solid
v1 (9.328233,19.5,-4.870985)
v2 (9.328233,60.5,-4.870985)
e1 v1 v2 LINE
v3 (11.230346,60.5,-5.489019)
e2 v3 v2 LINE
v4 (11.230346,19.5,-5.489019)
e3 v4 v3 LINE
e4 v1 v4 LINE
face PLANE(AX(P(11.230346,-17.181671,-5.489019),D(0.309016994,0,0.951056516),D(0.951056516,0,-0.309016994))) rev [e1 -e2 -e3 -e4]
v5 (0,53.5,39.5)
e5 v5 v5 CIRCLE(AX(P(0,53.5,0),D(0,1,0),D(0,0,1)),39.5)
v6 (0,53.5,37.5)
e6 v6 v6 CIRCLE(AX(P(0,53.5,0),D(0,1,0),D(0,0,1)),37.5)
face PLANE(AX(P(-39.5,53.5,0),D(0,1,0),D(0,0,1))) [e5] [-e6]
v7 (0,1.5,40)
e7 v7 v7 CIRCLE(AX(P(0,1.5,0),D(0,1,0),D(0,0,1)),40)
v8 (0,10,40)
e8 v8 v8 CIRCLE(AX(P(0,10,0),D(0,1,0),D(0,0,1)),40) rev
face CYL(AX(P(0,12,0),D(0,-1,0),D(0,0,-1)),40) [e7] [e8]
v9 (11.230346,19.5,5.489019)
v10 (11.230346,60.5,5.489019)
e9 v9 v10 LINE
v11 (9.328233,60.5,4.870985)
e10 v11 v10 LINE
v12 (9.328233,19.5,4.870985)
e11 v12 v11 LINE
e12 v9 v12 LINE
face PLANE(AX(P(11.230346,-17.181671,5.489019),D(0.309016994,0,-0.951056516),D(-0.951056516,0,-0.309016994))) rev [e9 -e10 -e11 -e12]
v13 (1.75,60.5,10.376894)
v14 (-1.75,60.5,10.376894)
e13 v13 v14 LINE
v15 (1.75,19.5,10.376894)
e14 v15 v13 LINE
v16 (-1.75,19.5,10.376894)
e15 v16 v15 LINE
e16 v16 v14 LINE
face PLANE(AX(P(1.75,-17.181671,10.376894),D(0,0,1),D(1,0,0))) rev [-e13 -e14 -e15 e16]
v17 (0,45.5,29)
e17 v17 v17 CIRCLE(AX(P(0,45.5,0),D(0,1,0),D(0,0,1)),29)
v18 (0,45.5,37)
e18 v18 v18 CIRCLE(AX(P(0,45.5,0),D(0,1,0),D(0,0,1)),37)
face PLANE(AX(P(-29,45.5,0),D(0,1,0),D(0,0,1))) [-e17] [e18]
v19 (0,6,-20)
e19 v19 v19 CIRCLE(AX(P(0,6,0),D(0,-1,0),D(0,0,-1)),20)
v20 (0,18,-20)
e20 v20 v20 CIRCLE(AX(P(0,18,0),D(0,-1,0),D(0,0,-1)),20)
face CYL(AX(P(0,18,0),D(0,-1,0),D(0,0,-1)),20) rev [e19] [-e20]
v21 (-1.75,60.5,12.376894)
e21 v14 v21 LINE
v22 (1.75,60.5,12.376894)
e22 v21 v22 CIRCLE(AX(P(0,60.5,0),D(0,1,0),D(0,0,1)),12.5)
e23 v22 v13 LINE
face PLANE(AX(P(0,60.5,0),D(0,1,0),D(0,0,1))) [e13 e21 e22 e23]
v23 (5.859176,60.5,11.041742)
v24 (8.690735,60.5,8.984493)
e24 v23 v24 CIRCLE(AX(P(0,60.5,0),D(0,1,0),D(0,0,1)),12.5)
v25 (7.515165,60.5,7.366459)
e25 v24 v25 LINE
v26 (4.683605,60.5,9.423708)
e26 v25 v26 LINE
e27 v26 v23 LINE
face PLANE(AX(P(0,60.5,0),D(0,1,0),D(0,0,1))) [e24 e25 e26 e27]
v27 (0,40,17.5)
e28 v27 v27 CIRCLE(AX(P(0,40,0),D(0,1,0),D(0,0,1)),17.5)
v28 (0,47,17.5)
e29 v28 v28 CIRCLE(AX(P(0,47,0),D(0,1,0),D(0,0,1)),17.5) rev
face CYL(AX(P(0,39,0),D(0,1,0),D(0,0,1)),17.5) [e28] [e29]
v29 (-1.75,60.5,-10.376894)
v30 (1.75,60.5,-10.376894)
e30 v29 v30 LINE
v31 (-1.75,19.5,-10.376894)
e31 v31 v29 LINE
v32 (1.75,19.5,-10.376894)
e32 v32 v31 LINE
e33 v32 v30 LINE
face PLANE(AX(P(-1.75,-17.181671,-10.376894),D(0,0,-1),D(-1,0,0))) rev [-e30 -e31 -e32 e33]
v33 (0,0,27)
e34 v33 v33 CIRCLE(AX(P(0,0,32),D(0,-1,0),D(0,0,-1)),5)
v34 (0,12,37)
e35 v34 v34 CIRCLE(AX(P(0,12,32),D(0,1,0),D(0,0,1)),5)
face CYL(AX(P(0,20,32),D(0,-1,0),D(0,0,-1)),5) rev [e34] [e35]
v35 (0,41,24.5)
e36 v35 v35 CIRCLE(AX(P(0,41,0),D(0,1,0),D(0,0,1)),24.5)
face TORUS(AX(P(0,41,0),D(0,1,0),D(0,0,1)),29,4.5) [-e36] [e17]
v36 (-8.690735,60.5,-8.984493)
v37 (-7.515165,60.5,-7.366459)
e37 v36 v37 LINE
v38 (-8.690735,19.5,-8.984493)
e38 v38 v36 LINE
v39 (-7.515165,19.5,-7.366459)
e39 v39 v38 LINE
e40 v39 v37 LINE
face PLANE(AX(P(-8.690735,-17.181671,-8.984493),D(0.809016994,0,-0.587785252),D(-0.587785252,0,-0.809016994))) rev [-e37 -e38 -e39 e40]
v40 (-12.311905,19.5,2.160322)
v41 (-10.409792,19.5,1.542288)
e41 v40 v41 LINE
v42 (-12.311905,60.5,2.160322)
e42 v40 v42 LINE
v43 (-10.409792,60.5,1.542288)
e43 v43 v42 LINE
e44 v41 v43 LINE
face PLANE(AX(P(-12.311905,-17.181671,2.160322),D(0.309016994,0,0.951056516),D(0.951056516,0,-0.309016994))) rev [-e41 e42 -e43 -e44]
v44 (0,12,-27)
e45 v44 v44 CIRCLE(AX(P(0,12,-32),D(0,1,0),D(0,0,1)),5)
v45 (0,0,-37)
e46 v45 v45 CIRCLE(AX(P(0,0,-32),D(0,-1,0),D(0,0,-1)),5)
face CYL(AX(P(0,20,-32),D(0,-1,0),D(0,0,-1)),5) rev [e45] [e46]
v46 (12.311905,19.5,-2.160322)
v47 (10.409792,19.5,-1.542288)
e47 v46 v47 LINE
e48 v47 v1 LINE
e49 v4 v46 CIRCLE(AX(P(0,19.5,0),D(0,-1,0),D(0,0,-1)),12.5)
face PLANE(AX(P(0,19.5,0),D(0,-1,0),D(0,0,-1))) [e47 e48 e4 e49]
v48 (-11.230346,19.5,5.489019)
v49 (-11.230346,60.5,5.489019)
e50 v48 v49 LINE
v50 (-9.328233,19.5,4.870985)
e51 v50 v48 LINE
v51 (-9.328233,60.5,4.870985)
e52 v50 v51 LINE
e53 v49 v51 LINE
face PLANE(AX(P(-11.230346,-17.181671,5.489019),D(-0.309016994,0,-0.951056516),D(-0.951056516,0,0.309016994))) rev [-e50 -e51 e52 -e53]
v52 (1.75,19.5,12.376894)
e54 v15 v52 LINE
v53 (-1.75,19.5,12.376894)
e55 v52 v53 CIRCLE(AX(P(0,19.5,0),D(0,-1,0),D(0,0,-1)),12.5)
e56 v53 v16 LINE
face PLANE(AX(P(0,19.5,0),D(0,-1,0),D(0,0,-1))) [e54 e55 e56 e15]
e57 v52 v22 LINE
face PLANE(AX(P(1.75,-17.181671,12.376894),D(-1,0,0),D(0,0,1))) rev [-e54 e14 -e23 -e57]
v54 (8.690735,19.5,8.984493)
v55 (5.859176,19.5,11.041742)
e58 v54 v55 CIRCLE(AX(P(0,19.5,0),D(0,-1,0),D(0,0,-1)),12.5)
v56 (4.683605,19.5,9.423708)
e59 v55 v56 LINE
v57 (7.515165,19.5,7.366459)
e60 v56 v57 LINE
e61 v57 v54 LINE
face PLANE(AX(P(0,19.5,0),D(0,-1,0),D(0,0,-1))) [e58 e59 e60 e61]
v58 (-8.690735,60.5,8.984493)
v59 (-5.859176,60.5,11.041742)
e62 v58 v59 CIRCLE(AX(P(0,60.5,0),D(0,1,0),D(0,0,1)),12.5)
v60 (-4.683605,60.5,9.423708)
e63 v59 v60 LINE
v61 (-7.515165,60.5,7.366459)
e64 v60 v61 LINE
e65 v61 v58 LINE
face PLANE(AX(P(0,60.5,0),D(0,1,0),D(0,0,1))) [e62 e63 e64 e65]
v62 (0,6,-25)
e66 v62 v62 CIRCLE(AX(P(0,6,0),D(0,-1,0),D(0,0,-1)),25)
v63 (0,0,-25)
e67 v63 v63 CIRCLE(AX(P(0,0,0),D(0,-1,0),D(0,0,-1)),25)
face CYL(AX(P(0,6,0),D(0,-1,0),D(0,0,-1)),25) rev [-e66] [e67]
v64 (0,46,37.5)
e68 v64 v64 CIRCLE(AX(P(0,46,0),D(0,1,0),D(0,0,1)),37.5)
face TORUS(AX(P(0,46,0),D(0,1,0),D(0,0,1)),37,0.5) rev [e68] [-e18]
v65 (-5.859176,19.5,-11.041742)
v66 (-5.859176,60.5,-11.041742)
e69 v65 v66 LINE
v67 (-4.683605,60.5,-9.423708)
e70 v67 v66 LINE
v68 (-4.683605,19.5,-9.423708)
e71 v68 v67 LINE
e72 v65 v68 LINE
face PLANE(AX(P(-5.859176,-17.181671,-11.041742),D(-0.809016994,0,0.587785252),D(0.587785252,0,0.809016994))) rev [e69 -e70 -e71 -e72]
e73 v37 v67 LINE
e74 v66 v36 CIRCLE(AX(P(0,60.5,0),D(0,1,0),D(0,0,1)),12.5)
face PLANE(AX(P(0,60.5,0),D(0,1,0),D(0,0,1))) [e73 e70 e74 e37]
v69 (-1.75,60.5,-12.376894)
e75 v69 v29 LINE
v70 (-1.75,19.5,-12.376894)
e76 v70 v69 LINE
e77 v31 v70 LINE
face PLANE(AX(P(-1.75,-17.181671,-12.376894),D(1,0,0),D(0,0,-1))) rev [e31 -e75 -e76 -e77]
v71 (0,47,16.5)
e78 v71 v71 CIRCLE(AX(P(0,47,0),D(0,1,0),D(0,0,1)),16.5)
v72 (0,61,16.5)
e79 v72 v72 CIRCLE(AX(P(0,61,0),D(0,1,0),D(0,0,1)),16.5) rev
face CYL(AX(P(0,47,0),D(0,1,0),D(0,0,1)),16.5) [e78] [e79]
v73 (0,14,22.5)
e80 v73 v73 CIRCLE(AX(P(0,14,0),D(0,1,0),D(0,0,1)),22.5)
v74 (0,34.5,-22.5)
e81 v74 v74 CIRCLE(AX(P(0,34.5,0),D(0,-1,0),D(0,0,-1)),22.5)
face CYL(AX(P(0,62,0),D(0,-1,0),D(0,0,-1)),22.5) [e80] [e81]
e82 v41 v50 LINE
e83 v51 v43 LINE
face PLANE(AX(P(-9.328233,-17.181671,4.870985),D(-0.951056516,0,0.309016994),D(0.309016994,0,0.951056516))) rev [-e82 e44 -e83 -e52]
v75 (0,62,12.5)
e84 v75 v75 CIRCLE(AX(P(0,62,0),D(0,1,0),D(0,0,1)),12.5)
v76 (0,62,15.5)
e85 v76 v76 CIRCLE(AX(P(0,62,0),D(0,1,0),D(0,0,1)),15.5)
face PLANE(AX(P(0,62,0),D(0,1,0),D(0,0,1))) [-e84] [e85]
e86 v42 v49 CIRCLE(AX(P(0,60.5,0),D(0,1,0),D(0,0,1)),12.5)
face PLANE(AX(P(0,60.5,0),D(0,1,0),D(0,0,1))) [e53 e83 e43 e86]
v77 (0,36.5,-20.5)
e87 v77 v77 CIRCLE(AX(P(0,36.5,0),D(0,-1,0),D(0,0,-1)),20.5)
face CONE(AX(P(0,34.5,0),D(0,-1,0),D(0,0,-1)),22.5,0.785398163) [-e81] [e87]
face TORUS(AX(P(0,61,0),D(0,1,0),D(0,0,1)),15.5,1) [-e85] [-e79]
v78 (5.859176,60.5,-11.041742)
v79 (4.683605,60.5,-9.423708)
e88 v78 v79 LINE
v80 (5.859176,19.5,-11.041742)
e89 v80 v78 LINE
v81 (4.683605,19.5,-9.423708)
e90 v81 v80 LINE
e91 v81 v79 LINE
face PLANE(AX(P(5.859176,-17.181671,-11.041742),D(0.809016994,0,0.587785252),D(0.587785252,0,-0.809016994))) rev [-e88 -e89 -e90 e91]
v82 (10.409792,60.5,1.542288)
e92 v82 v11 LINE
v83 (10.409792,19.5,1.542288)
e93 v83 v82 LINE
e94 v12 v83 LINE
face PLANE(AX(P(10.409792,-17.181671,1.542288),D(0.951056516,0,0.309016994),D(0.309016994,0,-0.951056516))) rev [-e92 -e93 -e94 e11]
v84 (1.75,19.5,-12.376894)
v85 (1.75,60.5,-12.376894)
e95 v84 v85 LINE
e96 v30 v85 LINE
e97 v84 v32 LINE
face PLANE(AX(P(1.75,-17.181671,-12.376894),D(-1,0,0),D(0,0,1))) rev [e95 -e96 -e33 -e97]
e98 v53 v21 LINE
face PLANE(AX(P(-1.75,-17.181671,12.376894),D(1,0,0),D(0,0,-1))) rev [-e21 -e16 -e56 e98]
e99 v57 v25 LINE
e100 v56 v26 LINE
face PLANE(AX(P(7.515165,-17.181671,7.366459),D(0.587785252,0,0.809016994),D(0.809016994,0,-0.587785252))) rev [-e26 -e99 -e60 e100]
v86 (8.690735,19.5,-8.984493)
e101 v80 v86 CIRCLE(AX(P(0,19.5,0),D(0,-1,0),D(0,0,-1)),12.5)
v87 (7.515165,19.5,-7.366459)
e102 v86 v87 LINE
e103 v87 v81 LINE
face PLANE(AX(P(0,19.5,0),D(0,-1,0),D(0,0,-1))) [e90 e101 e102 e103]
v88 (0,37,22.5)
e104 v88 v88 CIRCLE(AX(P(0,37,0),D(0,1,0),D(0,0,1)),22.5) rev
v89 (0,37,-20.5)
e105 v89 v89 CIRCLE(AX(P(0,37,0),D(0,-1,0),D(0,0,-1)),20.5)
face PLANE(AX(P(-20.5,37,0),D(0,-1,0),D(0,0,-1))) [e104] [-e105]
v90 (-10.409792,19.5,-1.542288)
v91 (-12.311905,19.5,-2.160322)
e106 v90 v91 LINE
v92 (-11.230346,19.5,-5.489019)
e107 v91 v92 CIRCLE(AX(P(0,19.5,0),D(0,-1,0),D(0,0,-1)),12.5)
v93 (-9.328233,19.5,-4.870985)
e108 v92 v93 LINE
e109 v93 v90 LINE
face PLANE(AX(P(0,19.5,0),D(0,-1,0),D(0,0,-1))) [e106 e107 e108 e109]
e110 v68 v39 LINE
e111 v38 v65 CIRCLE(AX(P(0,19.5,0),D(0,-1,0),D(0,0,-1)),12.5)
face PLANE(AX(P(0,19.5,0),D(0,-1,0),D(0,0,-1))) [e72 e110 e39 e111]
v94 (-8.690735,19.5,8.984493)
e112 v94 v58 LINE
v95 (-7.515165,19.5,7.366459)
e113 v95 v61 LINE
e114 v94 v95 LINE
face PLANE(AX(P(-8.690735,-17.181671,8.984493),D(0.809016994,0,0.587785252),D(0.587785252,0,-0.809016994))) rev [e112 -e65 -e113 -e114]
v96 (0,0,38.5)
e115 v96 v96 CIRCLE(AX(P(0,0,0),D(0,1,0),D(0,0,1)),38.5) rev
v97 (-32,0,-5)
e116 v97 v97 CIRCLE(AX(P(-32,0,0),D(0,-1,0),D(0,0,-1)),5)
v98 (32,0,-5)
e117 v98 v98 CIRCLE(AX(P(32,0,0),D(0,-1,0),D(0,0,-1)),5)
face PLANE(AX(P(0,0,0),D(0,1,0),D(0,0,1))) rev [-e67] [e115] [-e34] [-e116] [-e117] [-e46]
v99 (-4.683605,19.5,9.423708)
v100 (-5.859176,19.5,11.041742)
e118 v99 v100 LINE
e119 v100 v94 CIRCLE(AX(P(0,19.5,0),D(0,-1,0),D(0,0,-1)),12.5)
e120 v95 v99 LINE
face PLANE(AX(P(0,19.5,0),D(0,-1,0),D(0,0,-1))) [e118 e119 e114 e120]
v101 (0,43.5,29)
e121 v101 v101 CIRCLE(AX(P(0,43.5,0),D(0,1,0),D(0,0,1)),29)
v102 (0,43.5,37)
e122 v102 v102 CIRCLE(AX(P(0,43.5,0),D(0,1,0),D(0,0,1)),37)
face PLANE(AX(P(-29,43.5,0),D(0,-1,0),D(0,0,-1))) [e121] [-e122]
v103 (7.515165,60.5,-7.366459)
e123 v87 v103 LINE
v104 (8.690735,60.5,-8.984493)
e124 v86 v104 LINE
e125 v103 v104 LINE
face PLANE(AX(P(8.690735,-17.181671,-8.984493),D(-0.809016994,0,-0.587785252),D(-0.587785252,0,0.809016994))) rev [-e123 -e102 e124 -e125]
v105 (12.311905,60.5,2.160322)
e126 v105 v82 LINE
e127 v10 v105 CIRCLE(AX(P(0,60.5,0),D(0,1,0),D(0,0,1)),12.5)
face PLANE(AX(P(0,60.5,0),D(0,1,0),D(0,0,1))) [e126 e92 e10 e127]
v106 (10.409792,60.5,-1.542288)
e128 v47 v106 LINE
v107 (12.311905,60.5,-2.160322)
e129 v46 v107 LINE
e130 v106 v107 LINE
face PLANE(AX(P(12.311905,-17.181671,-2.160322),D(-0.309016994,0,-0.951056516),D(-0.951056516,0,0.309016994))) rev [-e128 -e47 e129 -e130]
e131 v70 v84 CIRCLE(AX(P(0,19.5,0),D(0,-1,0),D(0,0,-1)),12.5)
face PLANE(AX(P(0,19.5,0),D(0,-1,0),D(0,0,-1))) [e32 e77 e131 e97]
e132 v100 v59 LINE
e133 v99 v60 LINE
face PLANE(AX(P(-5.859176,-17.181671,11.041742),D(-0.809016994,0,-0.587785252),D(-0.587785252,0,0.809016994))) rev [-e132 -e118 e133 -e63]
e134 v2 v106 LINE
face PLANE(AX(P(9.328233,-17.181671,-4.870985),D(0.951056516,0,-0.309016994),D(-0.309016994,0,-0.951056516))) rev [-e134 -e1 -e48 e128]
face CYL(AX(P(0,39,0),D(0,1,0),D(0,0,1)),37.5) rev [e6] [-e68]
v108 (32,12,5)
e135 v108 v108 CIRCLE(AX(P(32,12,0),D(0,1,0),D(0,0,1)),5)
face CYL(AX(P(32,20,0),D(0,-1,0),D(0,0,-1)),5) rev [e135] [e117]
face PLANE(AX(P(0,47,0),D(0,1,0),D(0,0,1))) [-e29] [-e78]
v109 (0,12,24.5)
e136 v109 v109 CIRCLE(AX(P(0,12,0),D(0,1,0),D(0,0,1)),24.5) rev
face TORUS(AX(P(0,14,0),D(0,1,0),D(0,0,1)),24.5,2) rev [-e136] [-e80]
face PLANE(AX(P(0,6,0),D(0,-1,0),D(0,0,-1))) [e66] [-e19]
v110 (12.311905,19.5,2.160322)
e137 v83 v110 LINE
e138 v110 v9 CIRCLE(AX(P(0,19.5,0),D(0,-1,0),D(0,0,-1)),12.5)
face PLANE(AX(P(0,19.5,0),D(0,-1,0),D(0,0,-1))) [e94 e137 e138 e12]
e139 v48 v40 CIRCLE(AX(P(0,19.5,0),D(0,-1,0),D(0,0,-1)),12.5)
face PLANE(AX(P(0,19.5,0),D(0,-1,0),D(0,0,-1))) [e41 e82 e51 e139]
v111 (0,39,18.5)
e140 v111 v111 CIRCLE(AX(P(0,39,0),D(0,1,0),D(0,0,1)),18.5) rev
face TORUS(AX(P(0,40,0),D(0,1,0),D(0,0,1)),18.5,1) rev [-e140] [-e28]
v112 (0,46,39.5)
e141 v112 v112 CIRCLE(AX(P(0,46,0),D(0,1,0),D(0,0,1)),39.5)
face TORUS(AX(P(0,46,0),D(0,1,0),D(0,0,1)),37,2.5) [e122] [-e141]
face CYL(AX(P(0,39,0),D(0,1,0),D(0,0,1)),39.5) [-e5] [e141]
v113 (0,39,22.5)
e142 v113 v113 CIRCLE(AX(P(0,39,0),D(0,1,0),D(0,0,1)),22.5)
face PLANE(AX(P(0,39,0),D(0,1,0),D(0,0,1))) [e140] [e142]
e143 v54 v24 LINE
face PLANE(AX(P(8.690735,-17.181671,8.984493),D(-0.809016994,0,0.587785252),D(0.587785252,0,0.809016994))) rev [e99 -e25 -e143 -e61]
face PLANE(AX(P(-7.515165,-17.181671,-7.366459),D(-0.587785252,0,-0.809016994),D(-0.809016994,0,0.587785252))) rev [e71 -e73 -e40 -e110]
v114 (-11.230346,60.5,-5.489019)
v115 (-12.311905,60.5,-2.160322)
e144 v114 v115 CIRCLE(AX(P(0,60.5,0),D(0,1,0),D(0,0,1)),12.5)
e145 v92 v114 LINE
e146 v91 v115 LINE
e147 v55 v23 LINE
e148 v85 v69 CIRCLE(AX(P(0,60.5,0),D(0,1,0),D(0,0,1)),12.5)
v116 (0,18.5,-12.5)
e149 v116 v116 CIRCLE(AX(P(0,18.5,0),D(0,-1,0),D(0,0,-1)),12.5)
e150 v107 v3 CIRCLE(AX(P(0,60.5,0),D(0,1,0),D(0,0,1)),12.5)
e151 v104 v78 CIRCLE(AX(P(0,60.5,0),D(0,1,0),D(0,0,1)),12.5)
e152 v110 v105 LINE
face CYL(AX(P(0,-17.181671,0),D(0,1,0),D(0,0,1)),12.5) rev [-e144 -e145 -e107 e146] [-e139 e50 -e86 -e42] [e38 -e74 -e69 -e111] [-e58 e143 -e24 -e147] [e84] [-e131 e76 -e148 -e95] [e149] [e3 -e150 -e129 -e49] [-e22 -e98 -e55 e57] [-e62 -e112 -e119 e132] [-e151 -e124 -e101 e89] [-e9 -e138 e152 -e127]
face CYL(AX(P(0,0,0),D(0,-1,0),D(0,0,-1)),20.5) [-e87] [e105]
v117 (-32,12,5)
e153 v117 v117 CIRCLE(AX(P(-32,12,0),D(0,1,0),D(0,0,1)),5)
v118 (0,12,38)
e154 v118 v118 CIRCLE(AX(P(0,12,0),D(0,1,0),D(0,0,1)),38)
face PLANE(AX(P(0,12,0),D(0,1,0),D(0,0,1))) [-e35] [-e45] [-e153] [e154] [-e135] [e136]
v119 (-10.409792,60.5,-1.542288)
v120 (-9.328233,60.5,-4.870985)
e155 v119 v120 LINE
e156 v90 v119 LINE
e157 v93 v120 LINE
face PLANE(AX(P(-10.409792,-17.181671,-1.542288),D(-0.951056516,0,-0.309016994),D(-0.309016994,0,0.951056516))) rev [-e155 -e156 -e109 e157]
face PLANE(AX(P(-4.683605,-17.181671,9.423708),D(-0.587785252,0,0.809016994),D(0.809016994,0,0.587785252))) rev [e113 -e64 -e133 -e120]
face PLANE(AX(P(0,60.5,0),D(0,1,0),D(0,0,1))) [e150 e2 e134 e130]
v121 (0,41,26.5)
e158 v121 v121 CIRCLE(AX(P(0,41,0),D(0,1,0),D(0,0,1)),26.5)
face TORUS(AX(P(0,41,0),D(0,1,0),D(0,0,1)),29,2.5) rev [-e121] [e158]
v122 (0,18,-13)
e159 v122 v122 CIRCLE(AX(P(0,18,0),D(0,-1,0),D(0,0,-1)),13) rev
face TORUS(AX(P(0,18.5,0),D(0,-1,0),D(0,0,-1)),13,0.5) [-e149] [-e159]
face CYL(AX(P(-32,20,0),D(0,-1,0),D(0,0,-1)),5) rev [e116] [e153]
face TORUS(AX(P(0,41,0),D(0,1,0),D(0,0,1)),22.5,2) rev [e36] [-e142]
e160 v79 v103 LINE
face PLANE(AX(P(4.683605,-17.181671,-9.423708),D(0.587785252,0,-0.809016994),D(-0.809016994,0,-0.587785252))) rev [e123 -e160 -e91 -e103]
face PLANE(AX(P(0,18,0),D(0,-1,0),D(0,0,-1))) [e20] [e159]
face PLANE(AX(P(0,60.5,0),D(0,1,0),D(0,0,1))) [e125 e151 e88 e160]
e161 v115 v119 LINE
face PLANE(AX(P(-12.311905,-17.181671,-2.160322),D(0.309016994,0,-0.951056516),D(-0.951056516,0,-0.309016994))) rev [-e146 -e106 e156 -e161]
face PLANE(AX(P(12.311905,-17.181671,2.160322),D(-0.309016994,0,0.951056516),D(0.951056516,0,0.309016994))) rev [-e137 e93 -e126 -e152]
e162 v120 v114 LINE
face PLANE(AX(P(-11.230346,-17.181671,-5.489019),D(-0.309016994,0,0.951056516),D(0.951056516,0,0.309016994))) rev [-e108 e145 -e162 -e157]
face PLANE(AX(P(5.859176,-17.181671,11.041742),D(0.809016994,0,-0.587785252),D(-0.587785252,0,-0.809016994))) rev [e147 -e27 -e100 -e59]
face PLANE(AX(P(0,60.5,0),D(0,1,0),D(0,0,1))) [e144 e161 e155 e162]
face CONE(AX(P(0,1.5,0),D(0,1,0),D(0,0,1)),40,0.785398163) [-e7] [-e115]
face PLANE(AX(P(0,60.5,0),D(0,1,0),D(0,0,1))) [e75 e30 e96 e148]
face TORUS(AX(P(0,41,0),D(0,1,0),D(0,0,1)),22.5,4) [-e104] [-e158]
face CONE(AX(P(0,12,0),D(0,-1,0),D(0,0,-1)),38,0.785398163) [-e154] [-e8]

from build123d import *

# Parameters (mm, degrees)
SKETCH1_R       = 40
EXTRUDE1_DEPTH  = 12
SKETCH2_R       = 22.5
EXTRUDE2_DEPTH  = 50
SKETCH6_R       = 25
EXTRUDE5_DEPTH  = 6
SKETCH7_R       = 20
EXTRUDE6_DEPTH  = 12
SKETCH9_R       = 5
EXTRUDE8_DEPTH  = 20
EXTRUDE9_START  = -23
SKETCH10_R      = 22.5
SKETCH10_R_2    = 17.5
EXTRUDE9_DEPTH  = 23
EXTRUDE12_DEPTH = 44
EXTRUDE14_START = -1.5
SKETCH14_R      = 12.5
EXTRUDE14_DEPTH = 1.5
CHAMFER2_SIZE   = 2
CHAMFER3_SIZE   = 1.5
FILLET3_R       = 0.5
EXTRUDE15_START = -15
SKETCH15_R      = 20
SKETCH15_R_2    = 16.5
EXTRUDE15_DEPTH = 15
SKETCH16_R      = 12.5
EXTRUDE16_DEPTH = 1.5
FILLET4_R       = 1
FILLET5_R       = 2
FILLET6_R       = 1
SKETCH17_W      = 4
SKETCH17_H      = 0.5
CHAMFER4_SIZE   = 2


with BuildPart() as part:
    # Sketch1 → Extrude1 (new body)
    with BuildSketch(Plane(origin=(0, 0, 0), x_dir=(1, 0, 0), z_dir=(0, 1, 0))):
        with Locations(Location((0, 0, 0), (0, 0, 270))):
            Circle(SKETCH1_R)
    extrude(amount=EXTRUDE1_DEPTH)

    # Sketch2 → Extrude2 (add)
    with BuildSketch(Plane(origin=(0, 12, 0), x_dir=(1, 0, 0), z_dir=(0, 1, 0))):
        with Locations(Location((0, 0, 0), (0, 0, 270))):
            Circle(SKETCH2_R)
    extrude(amount=EXTRUDE2_DEPTH)

    # Sketch3 → Revolve1 (revolve)
    with BuildSketch(Plane.XY, mode=Mode.PRIVATE) as revolve1_sk:
        with BuildLine():
            Line((-29, 43.5), (-37, 43.5))
            ThreePointArc((-37, 43.5), (-38.767766953, 44.232233047), (-39.5, 46))
            Line((-39.5, 46), (-39.5, 53.5))
            Line((-39.5, 53.5), (-37.5, 53.5))
            Line((-37.5, 53.5), (-37.5, 46))
            ThreePointArc((-37.5, 46), (-37.353553391, 45.646446609), (-37, 45.5))
            Line((-37, 45.5), (-29, 45.5))
            ThreePointArc((-29, 45.5), (-25.818019485, 44.181980515), (-24.5, 41))
            ThreePointArc((-24.5, 41), (-23.914213562, 39.585786438), (-22.5, 39))
            Line((-22.5, 39), (0, 39))
            Line((0, 39), (0, 37))
            Line((0, 37), (-22.5, 37))
            ThreePointArc((-22.5, 37), (-25.328427125, 38.171572875), (-26.5, 41))
            ThreePointArc((-26.5, 41), (-27.232233047, 42.767766953), (-29, 43.5))
        make_face()
    revolve(revolve1_sk.sketch.rotate(Axis((0, 39, 0), (0, -1, 0)), 270), axis=Axis((0, 39, 0), (0, -1, 0)))

    # Sketch6 → Extrude5 (cut)
    with BuildSketch(Plane.XZ):
        with Locations(Location((0, 0, 0), (0, 0, 270))):
            Circle(SKETCH6_R)
    extrude(amount=-EXTRUDE5_DEPTH, mode=Mode.SUBTRACT)

    # Sketch7 → Extrude6 (cut)
    with BuildSketch(Plane.XZ.offset(-6)):
        with Locations(Location((0, 0, 0), (0, 0, 270))):
            Circle(SKETCH7_R)
    extrude(amount=-EXTRUDE6_DEPTH, mode=Mode.SUBTRACT)

    # Sketch9 → Extrude8 (cut)
    with BuildSketch(Plane.XZ):
        with Locations(Location((0, 32, 0), (0, 0, 270))):
            Circle(SKETCH9_R)
        with Locations(Location((32, 0, 0), (0, 0, 270))):
            Circle(SKETCH9_R)
        with Locations(Location((0, -32, 0), (0, 0, 270))):
            Circle(SKETCH9_R)
        with Locations(Location((-32, 0, 0), (0, 0, 270))):
            Circle(SKETCH9_R)
    extrude(amount=-EXTRUDE8_DEPTH, mode=Mode.SUBTRACT)

    # Sketch10 → Extrude9 (cut)
    with BuildSketch(Plane(origin=(0, 62, 0), x_dir=(1, 0, 0), z_dir=(0, 1, 0)).offset(EXTRUDE9_START)):
        with Locations(Location((0, 0, 0), (0, 0, 270))):
            Circle(SKETCH10_R)
        with Locations(Location((0, 0, 0), (0, 0, 270))):
            Circle(SKETCH10_R_2, mode=Mode.SUBTRACT)
    extrude(amount=EXTRUDE9_DEPTH, mode=Mode.SUBTRACT)

    # Sketch12 → Extrude12 (cut)
    with BuildSketch(Plane(origin=(0, 62, 0), x_dir=(-1, 0, 0), z_dir=(0, 1, 0))):
        with BuildLine():
            Line((-4.683605397, -9.42370762), (-7.515164877, -7.366459237))
            Line((-7.515164877, -7.366459237), (-8.690735382, -8.984493226))
            ThreePointArc((-8.690735382, -8.984493226), (-10.11271243, -7.347315654), (-11.230345755, -5.489019424))
            Line((-11.230345755, -5.489019424), (-9.328232722, -4.870985435))
            Line((-9.328232722, -4.870985435), (-10.409792202, -1.542287628))
            Line((-10.409792202, -1.542287628), (-12.311905235, -2.160321617))
            ThreePointArc((-12.311905235, -2.160321617), (-12.5, 0), (-12.311905235, 2.160321617))
            Line((-12.311905235, 2.160321617), (-10.409792202, 1.542287628))
            Line((-10.409792202, 1.542287628), (-9.328232722, 4.870985435))
            Line((-9.328232722, 4.870985435), (-11.230345755, 5.489019424))
            ThreePointArc((-11.230345755, 5.489019424), (-10.11271243, 7.347315654), (-8.690735382, 8.984493226))
            Line((-8.690735382, 8.984493226), (-7.515164877, 7.366459237))
            Line((-7.515164877, 7.366459237), (-4.683605397, 9.42370762))
            Line((-4.683605397, 9.42370762), (-5.859175901, 11.041741609))
            ThreePointArc((-5.859175901, 11.041741609), (-3.86271243, 11.888206454), (-1.75, 12.376893794))
            Line((-1.75, 12.376893794), (-1.75, 10.376893794))
            Line((-1.75, 10.376893794), (1.75, 10.376893794))
            Line((1.75, 10.376893794), (1.75, 12.376893794))
            ThreePointArc((1.75, 12.376893794), (3.86271243, 11.888206454), (5.859175901, 11.041741609))
            Line((5.859175901, 11.041741609), (4.683605397, 9.42370762))
            Line((4.683605397, 9.42370762), (7.515164877, 7.366459237))
            Line((7.515164877, 7.366459237), (8.690735382, 8.984493226))
            ThreePointArc((8.690735382, 8.984493226), (10.11271243, 7.347315654), (11.230345755, 5.489019424))
            Line((11.230345755, 5.489019424), (9.328232722, 4.870985435))
            Line((9.328232722, 4.870985435), (10.409792202, 1.542287628))
            Line((10.409792202, 1.542287628), (12.311905235, 2.160321617))
            ThreePointArc((12.311905235, 2.160321617), (12.5, 0), (12.311905235, -2.160321617))
            Line((12.311905235, -2.160321617), (10.409792202, -1.542287628))
            Line((10.409792202, -1.542287628), (9.328232722, -4.870985435))
            Line((9.328232722, -4.870985435), (11.230345755, -5.489019424))
            ThreePointArc((11.230345755, -5.489019424), (10.11271243, -7.347315654), (8.690735382, -8.984493226))
            Line((8.690735382, -8.984493226), (7.515164877, -7.366459237))
            Line((7.515164877, -7.366459237), (4.683605397, -9.42370762))
            Line((4.683605397, -9.42370762), (5.859175901, -11.041741609))
            ThreePointArc((5.859175901, -11.041741609), (3.86271243, -11.888206454), (1.75, -12.376893794))
            Line((1.75, -12.376893794), (1.75, -10.376893794))
            Line((1.75, -10.376893794), (-1.75, -10.376893794))
            Line((-1.75, -10.376893794), (-1.75, -12.376893794))
            ThreePointArc((-1.75, -12.376893794), (-3.86271243, -11.888206454), (-5.859175901, -11.041741609))
            Line((-5.859175901, -11.041741609), (-4.683605397, -9.42370762))
        make_face()
    extrude(amount=-EXTRUDE12_DEPTH, mode=Mode.SUBTRACT)

    # Sketch14 → Extrude14 (cut)
    with BuildSketch(Plane.XZ.offset(-18).offset(EXTRUDE14_START)):
        with Locations(Location((0, 0, 0), (0, 0, 81.952153753))):
            Circle(SKETCH14_R)
    extrude(amount=EXTRUDE14_DEPTH, mode=Mode.SUBTRACT)

    # Chamfer2
    chamfer2_edges = [part.edges().sort_by_distance(p)[0] for p in [
        (0, 12, -40),
    ]]
    chamfer(chamfer2_edges, length=CHAMFER2_SIZE)

    # Chamfer3
    chamfer3_edges = [part.edges().sort_by_distance(p)[0] for p in [
        (0, 0, -40),
    ]]
    chamfer(chamfer3_edges, length=CHAMFER3_SIZE)

    # Fillet3
    fillet3_edges = [part.edges().sort_by_distance(p)[0] for p in [
        (-7.347315654, 18, -10.11271243),
    ]]
    fillet(fillet3_edges, radius=FILLET3_R)

    # Sketch15 → Extrude15 (cut)
    with BuildSketch(Plane(origin=(0, 62, 0), x_dir=(1, 0, 0), z_dir=(0, 1, 0)).offset(EXTRUDE15_START)):
        with Locations(Location((0, 0, 0), (0, 0, 90))):
            Circle(SKETCH15_R)
        with Locations(Location((0, 0, 0), (0, 0, 270))):
            Circle(SKETCH15_R_2, mode=Mode.SUBTRACT)
    extrude(amount=EXTRUDE15_DEPTH, mode=Mode.SUBTRACT)

    # Sketch16 → Extrude16 (cut)
    with BuildSketch(Plane(origin=(0, 62, 0), x_dir=(-1, 0, 0), z_dir=(0, 1, 0))):
        with Locations(Location((0, 0, 0), (0, 0, 90))):
            Circle(SKETCH16_R)
    extrude(amount=-EXTRUDE16_DEPTH, mode=Mode.SUBTRACT)

    # Fillet4
    fillet4_edges = [part.edges().sort_by_distance(p)[0] for p in [
        (0, 62, -16.5),
    ]]
    fillet(fillet4_edges, radius=FILLET4_R)

    # Fillet5
    fillet5_edges = [part.edges().sort_by_distance(p)[0] for p in [
        (0, 12, -22.5),
    ]]
    fillet(fillet5_edges, radius=FILLET5_R)

    # Fillet6
    fillet6_edges = [part.edges().sort_by_distance(p)[0] for p in [
        (0, 39, -17.5),
    ]]
    fillet(fillet6_edges, radius=FILLET6_R)

    # Sketch17 → Cut-Revolve1 (revolve, cut)
    with BuildSketch(Plane.XY, mode=Mode.PRIVATE) as cut_revolve1_sk:
        with Locations((-22.5, 36.75)):
            Rectangle(SKETCH17_W, SKETCH17_H)
    revolve(cut_revolve1_sk.sketch.rotate(Axis((0, 0, 0), (0, 1, 0)), 270), axis=Axis((0, 0, 0), (0, 1, 0)), mode=Mode.SUBTRACT)

    # Chamfer4
    chamfer4_edges = [part.edges().sort_by_distance(p)[0] for p in [
        (0, 36.5, -22.5),
    ]]
    chamfer(chamfer4_edges, length=CHAMFER4_SIZE - 0.0001)  # a hair under: the kernel refuses the full size


solid = part.part
